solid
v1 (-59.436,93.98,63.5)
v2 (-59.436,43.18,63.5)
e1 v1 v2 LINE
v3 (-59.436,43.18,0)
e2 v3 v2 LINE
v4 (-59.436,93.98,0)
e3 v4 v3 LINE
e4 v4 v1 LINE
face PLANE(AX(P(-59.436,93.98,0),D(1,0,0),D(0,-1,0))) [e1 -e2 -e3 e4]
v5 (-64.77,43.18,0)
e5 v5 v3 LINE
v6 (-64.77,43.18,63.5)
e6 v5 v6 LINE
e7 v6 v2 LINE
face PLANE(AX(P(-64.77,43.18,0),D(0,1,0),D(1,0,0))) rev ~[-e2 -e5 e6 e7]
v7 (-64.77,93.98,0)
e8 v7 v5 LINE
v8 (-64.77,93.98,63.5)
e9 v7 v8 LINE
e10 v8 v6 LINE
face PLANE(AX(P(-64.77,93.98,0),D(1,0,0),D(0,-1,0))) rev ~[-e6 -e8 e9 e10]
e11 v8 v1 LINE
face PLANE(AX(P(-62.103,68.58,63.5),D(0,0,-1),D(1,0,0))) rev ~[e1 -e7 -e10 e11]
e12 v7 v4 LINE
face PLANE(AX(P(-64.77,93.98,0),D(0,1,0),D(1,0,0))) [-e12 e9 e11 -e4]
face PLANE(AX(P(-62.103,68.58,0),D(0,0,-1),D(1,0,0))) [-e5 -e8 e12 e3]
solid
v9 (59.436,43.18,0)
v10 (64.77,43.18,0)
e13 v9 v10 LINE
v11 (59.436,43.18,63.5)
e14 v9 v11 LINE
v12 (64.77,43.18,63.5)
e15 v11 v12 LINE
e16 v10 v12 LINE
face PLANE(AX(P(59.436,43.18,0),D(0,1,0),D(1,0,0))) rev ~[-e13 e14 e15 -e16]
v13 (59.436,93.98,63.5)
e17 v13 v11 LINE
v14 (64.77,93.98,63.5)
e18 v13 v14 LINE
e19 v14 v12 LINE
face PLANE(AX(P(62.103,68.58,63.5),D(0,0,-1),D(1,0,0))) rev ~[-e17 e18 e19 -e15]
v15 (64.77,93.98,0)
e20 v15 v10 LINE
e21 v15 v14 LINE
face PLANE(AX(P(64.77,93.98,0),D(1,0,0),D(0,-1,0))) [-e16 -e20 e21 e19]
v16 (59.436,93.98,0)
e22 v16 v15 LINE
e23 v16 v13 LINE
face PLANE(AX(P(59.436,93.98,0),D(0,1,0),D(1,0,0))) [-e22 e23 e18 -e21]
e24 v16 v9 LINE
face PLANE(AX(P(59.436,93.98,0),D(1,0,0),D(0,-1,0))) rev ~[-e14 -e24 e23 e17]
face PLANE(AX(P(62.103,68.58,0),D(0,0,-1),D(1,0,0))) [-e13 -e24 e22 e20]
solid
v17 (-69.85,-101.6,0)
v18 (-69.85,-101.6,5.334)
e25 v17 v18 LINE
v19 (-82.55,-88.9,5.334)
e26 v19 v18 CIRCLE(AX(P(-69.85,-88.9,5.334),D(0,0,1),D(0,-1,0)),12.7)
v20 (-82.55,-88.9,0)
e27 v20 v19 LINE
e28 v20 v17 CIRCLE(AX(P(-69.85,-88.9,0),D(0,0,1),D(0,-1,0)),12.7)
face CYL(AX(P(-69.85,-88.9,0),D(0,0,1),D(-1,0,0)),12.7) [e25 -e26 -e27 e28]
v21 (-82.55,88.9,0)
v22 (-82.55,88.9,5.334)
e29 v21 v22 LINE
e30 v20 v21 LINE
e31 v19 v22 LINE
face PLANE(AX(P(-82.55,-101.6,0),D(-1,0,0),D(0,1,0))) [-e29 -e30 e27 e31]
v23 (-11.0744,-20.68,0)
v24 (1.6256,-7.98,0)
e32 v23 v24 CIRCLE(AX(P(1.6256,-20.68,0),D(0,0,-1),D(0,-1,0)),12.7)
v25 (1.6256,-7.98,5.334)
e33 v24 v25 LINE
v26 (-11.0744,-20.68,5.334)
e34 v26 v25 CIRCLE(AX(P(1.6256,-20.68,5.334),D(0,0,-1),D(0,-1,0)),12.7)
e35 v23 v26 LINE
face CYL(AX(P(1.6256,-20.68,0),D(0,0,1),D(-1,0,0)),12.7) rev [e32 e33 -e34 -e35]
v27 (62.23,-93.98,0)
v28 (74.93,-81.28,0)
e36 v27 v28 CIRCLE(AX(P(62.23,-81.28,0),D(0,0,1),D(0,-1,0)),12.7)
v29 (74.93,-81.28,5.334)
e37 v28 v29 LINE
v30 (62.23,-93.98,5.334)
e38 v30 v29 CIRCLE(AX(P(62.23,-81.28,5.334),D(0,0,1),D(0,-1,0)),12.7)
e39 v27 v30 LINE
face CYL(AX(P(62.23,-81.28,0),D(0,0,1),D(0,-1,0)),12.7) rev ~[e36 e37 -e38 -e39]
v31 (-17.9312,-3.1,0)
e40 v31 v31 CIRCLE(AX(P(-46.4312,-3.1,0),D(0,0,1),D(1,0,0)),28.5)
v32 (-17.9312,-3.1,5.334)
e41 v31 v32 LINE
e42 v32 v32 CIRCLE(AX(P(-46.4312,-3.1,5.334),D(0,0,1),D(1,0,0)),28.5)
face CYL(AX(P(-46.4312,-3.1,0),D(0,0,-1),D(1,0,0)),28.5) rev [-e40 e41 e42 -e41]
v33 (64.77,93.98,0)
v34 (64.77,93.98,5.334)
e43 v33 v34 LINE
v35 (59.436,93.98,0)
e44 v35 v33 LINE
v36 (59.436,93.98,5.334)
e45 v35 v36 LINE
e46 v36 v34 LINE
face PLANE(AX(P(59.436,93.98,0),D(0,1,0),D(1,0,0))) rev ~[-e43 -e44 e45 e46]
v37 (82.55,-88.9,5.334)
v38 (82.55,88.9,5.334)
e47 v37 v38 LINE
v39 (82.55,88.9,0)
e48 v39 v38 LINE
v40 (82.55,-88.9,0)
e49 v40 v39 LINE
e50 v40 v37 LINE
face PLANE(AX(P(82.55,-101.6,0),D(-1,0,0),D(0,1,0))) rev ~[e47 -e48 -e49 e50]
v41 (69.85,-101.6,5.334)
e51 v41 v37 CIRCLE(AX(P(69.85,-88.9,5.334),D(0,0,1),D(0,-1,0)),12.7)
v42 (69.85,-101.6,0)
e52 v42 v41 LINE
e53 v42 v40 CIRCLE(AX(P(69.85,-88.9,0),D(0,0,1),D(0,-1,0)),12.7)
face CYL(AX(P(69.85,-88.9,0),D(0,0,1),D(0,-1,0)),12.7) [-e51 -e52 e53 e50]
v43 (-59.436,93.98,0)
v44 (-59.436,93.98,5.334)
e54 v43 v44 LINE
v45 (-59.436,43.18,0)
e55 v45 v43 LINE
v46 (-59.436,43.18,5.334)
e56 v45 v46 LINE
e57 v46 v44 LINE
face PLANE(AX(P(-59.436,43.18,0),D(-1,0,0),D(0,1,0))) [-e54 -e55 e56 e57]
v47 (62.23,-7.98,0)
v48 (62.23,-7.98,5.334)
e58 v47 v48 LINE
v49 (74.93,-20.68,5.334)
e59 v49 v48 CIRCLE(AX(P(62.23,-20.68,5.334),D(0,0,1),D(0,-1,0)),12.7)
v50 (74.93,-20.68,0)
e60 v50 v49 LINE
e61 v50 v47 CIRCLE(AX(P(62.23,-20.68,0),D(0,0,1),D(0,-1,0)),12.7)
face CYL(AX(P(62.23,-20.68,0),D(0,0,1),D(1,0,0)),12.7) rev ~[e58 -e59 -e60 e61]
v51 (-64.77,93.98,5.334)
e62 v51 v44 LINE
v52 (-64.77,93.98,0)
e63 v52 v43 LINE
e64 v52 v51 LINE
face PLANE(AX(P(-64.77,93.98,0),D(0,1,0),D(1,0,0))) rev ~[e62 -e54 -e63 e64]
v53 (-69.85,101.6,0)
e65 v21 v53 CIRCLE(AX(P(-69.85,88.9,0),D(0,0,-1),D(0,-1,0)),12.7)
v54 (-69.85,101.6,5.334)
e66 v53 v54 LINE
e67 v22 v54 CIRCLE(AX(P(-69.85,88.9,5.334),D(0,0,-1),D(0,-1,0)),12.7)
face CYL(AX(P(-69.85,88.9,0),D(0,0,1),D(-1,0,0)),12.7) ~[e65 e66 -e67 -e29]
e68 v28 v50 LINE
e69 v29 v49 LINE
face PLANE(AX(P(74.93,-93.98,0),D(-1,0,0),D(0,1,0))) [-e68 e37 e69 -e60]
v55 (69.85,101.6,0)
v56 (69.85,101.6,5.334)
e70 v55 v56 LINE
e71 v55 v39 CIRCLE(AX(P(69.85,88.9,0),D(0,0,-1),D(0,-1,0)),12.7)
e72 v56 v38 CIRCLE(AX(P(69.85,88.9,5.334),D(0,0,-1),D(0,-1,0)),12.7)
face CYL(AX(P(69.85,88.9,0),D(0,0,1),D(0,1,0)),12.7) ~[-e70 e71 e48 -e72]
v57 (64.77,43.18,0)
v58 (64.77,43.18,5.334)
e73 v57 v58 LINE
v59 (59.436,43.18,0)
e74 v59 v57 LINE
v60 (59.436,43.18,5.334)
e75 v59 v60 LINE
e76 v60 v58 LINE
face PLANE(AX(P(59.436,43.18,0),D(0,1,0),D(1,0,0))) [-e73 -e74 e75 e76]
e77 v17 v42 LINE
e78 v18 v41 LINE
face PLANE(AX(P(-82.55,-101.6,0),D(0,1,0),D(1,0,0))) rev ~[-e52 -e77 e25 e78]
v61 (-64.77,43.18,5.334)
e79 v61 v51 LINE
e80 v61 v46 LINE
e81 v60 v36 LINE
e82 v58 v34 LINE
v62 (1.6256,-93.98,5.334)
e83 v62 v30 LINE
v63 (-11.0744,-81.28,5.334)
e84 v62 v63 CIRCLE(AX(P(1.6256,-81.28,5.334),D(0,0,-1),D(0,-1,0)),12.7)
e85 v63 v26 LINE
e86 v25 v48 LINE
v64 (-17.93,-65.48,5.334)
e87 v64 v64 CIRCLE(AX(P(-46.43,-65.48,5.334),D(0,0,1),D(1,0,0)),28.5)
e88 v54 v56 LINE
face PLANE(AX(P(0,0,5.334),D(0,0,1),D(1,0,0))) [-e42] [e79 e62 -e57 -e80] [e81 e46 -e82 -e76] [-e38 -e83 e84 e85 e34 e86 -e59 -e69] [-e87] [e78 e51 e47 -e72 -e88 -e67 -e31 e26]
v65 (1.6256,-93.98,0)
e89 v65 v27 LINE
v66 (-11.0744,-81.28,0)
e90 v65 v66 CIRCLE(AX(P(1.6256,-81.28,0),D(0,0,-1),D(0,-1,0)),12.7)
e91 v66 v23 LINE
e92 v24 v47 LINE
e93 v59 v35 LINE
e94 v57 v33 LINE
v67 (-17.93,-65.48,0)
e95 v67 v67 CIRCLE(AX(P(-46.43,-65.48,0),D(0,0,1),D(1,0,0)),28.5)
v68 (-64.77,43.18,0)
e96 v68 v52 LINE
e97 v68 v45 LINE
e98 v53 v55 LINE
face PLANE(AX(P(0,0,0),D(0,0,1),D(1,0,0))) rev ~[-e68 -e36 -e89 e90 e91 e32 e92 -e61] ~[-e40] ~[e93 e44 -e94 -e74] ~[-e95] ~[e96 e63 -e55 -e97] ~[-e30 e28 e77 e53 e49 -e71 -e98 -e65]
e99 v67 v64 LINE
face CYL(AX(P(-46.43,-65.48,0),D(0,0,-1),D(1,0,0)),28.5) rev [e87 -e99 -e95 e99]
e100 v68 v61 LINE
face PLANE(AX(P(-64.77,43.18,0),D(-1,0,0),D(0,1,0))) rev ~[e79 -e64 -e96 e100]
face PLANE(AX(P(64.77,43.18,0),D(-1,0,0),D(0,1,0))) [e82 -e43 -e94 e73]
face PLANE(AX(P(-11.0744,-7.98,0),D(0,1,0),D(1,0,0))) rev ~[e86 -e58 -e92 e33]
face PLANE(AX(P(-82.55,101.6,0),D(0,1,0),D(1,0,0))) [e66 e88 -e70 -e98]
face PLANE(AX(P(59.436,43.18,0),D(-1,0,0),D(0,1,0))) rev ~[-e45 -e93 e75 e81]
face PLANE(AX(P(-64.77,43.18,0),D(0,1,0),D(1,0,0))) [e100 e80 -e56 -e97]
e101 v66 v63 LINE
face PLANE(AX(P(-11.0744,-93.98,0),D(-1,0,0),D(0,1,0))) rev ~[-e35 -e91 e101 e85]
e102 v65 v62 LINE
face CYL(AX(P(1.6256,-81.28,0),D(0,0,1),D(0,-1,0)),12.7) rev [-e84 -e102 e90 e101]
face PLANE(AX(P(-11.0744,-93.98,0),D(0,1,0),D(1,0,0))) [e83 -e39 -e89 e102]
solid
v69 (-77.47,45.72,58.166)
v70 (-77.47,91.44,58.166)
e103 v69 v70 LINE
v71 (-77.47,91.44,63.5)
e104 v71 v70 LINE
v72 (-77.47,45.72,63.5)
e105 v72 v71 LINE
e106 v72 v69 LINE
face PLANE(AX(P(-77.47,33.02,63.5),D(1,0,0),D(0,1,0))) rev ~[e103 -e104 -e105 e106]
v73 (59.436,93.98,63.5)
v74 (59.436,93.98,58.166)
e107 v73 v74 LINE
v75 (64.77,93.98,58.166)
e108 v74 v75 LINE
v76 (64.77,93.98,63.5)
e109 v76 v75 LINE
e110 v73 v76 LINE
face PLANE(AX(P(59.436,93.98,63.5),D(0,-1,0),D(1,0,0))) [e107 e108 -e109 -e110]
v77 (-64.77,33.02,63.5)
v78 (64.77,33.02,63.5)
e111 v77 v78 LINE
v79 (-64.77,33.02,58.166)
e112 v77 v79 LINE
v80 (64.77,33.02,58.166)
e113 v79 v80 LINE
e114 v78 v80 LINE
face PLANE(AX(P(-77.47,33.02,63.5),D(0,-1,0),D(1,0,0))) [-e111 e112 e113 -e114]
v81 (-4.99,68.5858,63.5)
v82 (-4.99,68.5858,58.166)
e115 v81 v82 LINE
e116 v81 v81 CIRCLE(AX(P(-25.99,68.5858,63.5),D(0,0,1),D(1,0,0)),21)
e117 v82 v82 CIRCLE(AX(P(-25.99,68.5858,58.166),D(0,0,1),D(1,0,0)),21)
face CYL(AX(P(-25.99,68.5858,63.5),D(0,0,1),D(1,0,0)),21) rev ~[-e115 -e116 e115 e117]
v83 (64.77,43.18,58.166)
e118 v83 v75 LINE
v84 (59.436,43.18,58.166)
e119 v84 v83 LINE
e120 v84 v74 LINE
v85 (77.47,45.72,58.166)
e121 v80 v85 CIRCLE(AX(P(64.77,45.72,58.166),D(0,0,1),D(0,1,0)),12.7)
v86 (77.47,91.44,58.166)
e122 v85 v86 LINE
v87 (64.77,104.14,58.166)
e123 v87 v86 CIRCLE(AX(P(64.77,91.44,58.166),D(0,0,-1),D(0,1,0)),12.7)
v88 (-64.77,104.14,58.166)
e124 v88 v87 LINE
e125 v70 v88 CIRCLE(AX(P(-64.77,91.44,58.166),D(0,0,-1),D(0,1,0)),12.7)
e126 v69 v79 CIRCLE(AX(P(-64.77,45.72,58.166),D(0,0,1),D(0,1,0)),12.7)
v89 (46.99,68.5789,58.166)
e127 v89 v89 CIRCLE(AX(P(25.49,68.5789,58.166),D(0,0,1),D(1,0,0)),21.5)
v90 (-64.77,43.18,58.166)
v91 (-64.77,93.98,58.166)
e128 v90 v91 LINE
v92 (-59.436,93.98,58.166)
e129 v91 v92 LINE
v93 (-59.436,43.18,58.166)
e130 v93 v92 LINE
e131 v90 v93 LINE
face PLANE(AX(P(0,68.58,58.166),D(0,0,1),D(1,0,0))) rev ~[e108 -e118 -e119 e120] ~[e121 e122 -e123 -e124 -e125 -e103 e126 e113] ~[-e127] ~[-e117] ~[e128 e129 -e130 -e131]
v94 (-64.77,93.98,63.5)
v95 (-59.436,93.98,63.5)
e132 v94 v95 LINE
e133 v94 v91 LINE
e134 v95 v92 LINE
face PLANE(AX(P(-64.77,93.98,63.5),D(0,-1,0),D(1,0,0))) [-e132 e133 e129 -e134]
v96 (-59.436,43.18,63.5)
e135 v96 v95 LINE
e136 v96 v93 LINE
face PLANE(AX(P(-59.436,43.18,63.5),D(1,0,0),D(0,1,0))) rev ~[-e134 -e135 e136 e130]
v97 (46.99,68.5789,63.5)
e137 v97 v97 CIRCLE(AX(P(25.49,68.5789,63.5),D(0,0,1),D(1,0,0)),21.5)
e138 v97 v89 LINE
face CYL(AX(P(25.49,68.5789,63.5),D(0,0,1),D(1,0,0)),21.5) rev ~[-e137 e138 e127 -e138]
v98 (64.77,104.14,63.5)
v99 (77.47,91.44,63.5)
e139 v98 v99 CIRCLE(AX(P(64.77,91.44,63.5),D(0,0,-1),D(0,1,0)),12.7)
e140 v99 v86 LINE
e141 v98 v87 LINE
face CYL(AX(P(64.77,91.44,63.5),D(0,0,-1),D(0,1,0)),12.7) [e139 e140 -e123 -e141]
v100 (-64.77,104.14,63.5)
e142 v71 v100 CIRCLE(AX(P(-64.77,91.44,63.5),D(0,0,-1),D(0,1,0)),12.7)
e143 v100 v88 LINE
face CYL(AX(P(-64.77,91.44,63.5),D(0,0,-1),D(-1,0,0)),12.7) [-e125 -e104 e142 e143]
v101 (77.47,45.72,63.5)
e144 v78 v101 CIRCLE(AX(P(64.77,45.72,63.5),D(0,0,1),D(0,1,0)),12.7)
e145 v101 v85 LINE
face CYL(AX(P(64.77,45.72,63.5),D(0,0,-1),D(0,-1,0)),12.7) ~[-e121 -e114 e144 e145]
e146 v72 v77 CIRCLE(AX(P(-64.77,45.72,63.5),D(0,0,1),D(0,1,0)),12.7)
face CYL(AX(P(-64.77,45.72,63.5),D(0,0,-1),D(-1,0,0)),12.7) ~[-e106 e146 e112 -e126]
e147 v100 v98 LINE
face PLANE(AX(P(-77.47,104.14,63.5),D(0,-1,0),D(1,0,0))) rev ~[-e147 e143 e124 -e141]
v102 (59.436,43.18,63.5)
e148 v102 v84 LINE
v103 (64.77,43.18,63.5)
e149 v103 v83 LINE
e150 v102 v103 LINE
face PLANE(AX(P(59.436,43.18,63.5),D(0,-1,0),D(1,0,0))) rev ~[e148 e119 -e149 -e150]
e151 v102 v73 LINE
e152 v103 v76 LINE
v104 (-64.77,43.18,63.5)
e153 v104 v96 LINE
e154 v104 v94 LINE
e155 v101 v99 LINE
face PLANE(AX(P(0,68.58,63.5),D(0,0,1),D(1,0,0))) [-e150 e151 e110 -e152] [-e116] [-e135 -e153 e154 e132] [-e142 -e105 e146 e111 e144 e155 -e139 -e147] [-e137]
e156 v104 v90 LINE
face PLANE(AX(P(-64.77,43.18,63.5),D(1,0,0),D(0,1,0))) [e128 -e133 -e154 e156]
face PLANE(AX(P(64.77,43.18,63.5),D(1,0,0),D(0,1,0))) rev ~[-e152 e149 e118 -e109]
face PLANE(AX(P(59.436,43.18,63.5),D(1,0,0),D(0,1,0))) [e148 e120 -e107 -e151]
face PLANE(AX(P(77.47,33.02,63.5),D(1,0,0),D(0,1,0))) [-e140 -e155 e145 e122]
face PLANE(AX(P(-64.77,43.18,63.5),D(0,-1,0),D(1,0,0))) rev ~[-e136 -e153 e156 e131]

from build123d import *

# Parameters (mm, degrees)
F1_W     = 165.1
F1_H     = 203.2
F1_R     = 28.5
F1_W_2   = 86.0044
F1_H_2   = 86
F1_W_3   = 5.334
F1_H_3   = 50.8
F2_DEPTH = 5.334
F3_W     = 5.334
F3_H     = 50.8
F4_DEPTH = 63.5
F5_W     = 154.94
F5_H     = 71.12
F5_W_2   = 5.334
F5_H_2   = 50.8
F5_R     = 21.5
F5_R_2   = 21
F6_DEPTH = 5.334
F7_R     = 12.7
F7_2_R   = 12.7


# Not quite as in the source:
# - a variable given as a bare number and used for a length is read in inches; the dataset says mm whatever the document's units were


with BuildPart() as f2:
    # F1 (on Top) → F2 (new body)
    with BuildSketch(Plane.XY):
        Rectangle(F1_W, F1_H)
        with Locations((-46.43, -65.48)):
            Circle(F1_R, mode=Mode.SUBTRACT)
        with Locations((-46.4312, -3.1)):
            Circle(F1_R, mode=Mode.SUBTRACT)
        with Locations((31.9278, -50.98)):
            Rectangle(F1_W_2, F1_H_2, mode=Mode.SUBTRACT)
        with Locations((-62.103, 68.58)):
            Rectangle(F1_W_3, F1_H_3, mode=Mode.SUBTRACT)
        with Locations((62.103, 68.58)):
            Rectangle(F1_W_3, F1_H_3, mode=Mode.SUBTRACT)
    extrude(amount=F2_DEPTH)

    # F7
    f7_edges = [f2.edges().sort_by_distance(p)[0] for p in [
        (-82.55, -101.6, 2.667),
        (82.55, -101.6, 2.667),
        (-82.55, 101.6, 2.667),
        (82.55, 101.6, 2.667),
        (-11.0744, -7.98, 2.667),
        (74.93, -7.98, 2.667),
        (74.93, -93.98, 2.667),
        (-11.0744, -93.98, 2.667),
    ]]
    fillet(f7_edges, radius=F7_R)


with BuildPart() as f4:
    # F3 (on face) → F4 (new body)
    with BuildSketch(Plane(origin=(0, 0, 0), x_dir=(1, 0, 0), z_dir=(0, 0, -1))):
        with Locations((-62.103, -68.58)):
            Rectangle(F3_W, F3_H)
    extrude(amount=-F4_DEPTH)


with BuildPart() as f4b:
    # F3 (on face) → F4, piece 2 (new body)
    with BuildSketch(Plane(origin=(0, 0, 0), x_dir=(1, 0, 0), z_dir=(0, 0, -1))):
        with Locations((62.103, -68.58)):
            Rectangle(F3_W, F3_H)
    extrude(amount=-F4_DEPTH)


with BuildPart() as f6:
    # F5 (on face) → F6 (new body)
    with BuildSketch(Plane.XY.offset(63.5)):
        with Locations((0, 68.58)):
            Rectangle(F5_W, F5_H)
        with Locations((-62.103, 68.58)):
            Rectangle(F5_W_2, F5_H_2, mode=Mode.SUBTRACT)
        with Locations((25.49, 68.5789)):
            Circle(F5_R, mode=Mode.SUBTRACT)
        with Locations((62.103, 68.58)):
            Rectangle(F5_W_2, F5_H_2, mode=Mode.SUBTRACT)
        with Locations((-25.99, 68.5858)):
            Circle(F5_R_2, mode=Mode.SUBTRACT)
    extrude(amount=-F6_DEPTH)

    # F7#2
    f7_2_edges = [f6.edges().sort_by_distance(p)[0] for p in [
        (-77.47, 33.02, 60.833),
        (-77.47, 104.14, 60.833),
        (77.47, 33.02, 60.833),
        (77.47, 104.14, 60.833),
    ]]
    fillet(f7_2_edges, radius=F7_2_R)


solid = Compound([f2.part, f4.part, f4b.part, f6.part])
